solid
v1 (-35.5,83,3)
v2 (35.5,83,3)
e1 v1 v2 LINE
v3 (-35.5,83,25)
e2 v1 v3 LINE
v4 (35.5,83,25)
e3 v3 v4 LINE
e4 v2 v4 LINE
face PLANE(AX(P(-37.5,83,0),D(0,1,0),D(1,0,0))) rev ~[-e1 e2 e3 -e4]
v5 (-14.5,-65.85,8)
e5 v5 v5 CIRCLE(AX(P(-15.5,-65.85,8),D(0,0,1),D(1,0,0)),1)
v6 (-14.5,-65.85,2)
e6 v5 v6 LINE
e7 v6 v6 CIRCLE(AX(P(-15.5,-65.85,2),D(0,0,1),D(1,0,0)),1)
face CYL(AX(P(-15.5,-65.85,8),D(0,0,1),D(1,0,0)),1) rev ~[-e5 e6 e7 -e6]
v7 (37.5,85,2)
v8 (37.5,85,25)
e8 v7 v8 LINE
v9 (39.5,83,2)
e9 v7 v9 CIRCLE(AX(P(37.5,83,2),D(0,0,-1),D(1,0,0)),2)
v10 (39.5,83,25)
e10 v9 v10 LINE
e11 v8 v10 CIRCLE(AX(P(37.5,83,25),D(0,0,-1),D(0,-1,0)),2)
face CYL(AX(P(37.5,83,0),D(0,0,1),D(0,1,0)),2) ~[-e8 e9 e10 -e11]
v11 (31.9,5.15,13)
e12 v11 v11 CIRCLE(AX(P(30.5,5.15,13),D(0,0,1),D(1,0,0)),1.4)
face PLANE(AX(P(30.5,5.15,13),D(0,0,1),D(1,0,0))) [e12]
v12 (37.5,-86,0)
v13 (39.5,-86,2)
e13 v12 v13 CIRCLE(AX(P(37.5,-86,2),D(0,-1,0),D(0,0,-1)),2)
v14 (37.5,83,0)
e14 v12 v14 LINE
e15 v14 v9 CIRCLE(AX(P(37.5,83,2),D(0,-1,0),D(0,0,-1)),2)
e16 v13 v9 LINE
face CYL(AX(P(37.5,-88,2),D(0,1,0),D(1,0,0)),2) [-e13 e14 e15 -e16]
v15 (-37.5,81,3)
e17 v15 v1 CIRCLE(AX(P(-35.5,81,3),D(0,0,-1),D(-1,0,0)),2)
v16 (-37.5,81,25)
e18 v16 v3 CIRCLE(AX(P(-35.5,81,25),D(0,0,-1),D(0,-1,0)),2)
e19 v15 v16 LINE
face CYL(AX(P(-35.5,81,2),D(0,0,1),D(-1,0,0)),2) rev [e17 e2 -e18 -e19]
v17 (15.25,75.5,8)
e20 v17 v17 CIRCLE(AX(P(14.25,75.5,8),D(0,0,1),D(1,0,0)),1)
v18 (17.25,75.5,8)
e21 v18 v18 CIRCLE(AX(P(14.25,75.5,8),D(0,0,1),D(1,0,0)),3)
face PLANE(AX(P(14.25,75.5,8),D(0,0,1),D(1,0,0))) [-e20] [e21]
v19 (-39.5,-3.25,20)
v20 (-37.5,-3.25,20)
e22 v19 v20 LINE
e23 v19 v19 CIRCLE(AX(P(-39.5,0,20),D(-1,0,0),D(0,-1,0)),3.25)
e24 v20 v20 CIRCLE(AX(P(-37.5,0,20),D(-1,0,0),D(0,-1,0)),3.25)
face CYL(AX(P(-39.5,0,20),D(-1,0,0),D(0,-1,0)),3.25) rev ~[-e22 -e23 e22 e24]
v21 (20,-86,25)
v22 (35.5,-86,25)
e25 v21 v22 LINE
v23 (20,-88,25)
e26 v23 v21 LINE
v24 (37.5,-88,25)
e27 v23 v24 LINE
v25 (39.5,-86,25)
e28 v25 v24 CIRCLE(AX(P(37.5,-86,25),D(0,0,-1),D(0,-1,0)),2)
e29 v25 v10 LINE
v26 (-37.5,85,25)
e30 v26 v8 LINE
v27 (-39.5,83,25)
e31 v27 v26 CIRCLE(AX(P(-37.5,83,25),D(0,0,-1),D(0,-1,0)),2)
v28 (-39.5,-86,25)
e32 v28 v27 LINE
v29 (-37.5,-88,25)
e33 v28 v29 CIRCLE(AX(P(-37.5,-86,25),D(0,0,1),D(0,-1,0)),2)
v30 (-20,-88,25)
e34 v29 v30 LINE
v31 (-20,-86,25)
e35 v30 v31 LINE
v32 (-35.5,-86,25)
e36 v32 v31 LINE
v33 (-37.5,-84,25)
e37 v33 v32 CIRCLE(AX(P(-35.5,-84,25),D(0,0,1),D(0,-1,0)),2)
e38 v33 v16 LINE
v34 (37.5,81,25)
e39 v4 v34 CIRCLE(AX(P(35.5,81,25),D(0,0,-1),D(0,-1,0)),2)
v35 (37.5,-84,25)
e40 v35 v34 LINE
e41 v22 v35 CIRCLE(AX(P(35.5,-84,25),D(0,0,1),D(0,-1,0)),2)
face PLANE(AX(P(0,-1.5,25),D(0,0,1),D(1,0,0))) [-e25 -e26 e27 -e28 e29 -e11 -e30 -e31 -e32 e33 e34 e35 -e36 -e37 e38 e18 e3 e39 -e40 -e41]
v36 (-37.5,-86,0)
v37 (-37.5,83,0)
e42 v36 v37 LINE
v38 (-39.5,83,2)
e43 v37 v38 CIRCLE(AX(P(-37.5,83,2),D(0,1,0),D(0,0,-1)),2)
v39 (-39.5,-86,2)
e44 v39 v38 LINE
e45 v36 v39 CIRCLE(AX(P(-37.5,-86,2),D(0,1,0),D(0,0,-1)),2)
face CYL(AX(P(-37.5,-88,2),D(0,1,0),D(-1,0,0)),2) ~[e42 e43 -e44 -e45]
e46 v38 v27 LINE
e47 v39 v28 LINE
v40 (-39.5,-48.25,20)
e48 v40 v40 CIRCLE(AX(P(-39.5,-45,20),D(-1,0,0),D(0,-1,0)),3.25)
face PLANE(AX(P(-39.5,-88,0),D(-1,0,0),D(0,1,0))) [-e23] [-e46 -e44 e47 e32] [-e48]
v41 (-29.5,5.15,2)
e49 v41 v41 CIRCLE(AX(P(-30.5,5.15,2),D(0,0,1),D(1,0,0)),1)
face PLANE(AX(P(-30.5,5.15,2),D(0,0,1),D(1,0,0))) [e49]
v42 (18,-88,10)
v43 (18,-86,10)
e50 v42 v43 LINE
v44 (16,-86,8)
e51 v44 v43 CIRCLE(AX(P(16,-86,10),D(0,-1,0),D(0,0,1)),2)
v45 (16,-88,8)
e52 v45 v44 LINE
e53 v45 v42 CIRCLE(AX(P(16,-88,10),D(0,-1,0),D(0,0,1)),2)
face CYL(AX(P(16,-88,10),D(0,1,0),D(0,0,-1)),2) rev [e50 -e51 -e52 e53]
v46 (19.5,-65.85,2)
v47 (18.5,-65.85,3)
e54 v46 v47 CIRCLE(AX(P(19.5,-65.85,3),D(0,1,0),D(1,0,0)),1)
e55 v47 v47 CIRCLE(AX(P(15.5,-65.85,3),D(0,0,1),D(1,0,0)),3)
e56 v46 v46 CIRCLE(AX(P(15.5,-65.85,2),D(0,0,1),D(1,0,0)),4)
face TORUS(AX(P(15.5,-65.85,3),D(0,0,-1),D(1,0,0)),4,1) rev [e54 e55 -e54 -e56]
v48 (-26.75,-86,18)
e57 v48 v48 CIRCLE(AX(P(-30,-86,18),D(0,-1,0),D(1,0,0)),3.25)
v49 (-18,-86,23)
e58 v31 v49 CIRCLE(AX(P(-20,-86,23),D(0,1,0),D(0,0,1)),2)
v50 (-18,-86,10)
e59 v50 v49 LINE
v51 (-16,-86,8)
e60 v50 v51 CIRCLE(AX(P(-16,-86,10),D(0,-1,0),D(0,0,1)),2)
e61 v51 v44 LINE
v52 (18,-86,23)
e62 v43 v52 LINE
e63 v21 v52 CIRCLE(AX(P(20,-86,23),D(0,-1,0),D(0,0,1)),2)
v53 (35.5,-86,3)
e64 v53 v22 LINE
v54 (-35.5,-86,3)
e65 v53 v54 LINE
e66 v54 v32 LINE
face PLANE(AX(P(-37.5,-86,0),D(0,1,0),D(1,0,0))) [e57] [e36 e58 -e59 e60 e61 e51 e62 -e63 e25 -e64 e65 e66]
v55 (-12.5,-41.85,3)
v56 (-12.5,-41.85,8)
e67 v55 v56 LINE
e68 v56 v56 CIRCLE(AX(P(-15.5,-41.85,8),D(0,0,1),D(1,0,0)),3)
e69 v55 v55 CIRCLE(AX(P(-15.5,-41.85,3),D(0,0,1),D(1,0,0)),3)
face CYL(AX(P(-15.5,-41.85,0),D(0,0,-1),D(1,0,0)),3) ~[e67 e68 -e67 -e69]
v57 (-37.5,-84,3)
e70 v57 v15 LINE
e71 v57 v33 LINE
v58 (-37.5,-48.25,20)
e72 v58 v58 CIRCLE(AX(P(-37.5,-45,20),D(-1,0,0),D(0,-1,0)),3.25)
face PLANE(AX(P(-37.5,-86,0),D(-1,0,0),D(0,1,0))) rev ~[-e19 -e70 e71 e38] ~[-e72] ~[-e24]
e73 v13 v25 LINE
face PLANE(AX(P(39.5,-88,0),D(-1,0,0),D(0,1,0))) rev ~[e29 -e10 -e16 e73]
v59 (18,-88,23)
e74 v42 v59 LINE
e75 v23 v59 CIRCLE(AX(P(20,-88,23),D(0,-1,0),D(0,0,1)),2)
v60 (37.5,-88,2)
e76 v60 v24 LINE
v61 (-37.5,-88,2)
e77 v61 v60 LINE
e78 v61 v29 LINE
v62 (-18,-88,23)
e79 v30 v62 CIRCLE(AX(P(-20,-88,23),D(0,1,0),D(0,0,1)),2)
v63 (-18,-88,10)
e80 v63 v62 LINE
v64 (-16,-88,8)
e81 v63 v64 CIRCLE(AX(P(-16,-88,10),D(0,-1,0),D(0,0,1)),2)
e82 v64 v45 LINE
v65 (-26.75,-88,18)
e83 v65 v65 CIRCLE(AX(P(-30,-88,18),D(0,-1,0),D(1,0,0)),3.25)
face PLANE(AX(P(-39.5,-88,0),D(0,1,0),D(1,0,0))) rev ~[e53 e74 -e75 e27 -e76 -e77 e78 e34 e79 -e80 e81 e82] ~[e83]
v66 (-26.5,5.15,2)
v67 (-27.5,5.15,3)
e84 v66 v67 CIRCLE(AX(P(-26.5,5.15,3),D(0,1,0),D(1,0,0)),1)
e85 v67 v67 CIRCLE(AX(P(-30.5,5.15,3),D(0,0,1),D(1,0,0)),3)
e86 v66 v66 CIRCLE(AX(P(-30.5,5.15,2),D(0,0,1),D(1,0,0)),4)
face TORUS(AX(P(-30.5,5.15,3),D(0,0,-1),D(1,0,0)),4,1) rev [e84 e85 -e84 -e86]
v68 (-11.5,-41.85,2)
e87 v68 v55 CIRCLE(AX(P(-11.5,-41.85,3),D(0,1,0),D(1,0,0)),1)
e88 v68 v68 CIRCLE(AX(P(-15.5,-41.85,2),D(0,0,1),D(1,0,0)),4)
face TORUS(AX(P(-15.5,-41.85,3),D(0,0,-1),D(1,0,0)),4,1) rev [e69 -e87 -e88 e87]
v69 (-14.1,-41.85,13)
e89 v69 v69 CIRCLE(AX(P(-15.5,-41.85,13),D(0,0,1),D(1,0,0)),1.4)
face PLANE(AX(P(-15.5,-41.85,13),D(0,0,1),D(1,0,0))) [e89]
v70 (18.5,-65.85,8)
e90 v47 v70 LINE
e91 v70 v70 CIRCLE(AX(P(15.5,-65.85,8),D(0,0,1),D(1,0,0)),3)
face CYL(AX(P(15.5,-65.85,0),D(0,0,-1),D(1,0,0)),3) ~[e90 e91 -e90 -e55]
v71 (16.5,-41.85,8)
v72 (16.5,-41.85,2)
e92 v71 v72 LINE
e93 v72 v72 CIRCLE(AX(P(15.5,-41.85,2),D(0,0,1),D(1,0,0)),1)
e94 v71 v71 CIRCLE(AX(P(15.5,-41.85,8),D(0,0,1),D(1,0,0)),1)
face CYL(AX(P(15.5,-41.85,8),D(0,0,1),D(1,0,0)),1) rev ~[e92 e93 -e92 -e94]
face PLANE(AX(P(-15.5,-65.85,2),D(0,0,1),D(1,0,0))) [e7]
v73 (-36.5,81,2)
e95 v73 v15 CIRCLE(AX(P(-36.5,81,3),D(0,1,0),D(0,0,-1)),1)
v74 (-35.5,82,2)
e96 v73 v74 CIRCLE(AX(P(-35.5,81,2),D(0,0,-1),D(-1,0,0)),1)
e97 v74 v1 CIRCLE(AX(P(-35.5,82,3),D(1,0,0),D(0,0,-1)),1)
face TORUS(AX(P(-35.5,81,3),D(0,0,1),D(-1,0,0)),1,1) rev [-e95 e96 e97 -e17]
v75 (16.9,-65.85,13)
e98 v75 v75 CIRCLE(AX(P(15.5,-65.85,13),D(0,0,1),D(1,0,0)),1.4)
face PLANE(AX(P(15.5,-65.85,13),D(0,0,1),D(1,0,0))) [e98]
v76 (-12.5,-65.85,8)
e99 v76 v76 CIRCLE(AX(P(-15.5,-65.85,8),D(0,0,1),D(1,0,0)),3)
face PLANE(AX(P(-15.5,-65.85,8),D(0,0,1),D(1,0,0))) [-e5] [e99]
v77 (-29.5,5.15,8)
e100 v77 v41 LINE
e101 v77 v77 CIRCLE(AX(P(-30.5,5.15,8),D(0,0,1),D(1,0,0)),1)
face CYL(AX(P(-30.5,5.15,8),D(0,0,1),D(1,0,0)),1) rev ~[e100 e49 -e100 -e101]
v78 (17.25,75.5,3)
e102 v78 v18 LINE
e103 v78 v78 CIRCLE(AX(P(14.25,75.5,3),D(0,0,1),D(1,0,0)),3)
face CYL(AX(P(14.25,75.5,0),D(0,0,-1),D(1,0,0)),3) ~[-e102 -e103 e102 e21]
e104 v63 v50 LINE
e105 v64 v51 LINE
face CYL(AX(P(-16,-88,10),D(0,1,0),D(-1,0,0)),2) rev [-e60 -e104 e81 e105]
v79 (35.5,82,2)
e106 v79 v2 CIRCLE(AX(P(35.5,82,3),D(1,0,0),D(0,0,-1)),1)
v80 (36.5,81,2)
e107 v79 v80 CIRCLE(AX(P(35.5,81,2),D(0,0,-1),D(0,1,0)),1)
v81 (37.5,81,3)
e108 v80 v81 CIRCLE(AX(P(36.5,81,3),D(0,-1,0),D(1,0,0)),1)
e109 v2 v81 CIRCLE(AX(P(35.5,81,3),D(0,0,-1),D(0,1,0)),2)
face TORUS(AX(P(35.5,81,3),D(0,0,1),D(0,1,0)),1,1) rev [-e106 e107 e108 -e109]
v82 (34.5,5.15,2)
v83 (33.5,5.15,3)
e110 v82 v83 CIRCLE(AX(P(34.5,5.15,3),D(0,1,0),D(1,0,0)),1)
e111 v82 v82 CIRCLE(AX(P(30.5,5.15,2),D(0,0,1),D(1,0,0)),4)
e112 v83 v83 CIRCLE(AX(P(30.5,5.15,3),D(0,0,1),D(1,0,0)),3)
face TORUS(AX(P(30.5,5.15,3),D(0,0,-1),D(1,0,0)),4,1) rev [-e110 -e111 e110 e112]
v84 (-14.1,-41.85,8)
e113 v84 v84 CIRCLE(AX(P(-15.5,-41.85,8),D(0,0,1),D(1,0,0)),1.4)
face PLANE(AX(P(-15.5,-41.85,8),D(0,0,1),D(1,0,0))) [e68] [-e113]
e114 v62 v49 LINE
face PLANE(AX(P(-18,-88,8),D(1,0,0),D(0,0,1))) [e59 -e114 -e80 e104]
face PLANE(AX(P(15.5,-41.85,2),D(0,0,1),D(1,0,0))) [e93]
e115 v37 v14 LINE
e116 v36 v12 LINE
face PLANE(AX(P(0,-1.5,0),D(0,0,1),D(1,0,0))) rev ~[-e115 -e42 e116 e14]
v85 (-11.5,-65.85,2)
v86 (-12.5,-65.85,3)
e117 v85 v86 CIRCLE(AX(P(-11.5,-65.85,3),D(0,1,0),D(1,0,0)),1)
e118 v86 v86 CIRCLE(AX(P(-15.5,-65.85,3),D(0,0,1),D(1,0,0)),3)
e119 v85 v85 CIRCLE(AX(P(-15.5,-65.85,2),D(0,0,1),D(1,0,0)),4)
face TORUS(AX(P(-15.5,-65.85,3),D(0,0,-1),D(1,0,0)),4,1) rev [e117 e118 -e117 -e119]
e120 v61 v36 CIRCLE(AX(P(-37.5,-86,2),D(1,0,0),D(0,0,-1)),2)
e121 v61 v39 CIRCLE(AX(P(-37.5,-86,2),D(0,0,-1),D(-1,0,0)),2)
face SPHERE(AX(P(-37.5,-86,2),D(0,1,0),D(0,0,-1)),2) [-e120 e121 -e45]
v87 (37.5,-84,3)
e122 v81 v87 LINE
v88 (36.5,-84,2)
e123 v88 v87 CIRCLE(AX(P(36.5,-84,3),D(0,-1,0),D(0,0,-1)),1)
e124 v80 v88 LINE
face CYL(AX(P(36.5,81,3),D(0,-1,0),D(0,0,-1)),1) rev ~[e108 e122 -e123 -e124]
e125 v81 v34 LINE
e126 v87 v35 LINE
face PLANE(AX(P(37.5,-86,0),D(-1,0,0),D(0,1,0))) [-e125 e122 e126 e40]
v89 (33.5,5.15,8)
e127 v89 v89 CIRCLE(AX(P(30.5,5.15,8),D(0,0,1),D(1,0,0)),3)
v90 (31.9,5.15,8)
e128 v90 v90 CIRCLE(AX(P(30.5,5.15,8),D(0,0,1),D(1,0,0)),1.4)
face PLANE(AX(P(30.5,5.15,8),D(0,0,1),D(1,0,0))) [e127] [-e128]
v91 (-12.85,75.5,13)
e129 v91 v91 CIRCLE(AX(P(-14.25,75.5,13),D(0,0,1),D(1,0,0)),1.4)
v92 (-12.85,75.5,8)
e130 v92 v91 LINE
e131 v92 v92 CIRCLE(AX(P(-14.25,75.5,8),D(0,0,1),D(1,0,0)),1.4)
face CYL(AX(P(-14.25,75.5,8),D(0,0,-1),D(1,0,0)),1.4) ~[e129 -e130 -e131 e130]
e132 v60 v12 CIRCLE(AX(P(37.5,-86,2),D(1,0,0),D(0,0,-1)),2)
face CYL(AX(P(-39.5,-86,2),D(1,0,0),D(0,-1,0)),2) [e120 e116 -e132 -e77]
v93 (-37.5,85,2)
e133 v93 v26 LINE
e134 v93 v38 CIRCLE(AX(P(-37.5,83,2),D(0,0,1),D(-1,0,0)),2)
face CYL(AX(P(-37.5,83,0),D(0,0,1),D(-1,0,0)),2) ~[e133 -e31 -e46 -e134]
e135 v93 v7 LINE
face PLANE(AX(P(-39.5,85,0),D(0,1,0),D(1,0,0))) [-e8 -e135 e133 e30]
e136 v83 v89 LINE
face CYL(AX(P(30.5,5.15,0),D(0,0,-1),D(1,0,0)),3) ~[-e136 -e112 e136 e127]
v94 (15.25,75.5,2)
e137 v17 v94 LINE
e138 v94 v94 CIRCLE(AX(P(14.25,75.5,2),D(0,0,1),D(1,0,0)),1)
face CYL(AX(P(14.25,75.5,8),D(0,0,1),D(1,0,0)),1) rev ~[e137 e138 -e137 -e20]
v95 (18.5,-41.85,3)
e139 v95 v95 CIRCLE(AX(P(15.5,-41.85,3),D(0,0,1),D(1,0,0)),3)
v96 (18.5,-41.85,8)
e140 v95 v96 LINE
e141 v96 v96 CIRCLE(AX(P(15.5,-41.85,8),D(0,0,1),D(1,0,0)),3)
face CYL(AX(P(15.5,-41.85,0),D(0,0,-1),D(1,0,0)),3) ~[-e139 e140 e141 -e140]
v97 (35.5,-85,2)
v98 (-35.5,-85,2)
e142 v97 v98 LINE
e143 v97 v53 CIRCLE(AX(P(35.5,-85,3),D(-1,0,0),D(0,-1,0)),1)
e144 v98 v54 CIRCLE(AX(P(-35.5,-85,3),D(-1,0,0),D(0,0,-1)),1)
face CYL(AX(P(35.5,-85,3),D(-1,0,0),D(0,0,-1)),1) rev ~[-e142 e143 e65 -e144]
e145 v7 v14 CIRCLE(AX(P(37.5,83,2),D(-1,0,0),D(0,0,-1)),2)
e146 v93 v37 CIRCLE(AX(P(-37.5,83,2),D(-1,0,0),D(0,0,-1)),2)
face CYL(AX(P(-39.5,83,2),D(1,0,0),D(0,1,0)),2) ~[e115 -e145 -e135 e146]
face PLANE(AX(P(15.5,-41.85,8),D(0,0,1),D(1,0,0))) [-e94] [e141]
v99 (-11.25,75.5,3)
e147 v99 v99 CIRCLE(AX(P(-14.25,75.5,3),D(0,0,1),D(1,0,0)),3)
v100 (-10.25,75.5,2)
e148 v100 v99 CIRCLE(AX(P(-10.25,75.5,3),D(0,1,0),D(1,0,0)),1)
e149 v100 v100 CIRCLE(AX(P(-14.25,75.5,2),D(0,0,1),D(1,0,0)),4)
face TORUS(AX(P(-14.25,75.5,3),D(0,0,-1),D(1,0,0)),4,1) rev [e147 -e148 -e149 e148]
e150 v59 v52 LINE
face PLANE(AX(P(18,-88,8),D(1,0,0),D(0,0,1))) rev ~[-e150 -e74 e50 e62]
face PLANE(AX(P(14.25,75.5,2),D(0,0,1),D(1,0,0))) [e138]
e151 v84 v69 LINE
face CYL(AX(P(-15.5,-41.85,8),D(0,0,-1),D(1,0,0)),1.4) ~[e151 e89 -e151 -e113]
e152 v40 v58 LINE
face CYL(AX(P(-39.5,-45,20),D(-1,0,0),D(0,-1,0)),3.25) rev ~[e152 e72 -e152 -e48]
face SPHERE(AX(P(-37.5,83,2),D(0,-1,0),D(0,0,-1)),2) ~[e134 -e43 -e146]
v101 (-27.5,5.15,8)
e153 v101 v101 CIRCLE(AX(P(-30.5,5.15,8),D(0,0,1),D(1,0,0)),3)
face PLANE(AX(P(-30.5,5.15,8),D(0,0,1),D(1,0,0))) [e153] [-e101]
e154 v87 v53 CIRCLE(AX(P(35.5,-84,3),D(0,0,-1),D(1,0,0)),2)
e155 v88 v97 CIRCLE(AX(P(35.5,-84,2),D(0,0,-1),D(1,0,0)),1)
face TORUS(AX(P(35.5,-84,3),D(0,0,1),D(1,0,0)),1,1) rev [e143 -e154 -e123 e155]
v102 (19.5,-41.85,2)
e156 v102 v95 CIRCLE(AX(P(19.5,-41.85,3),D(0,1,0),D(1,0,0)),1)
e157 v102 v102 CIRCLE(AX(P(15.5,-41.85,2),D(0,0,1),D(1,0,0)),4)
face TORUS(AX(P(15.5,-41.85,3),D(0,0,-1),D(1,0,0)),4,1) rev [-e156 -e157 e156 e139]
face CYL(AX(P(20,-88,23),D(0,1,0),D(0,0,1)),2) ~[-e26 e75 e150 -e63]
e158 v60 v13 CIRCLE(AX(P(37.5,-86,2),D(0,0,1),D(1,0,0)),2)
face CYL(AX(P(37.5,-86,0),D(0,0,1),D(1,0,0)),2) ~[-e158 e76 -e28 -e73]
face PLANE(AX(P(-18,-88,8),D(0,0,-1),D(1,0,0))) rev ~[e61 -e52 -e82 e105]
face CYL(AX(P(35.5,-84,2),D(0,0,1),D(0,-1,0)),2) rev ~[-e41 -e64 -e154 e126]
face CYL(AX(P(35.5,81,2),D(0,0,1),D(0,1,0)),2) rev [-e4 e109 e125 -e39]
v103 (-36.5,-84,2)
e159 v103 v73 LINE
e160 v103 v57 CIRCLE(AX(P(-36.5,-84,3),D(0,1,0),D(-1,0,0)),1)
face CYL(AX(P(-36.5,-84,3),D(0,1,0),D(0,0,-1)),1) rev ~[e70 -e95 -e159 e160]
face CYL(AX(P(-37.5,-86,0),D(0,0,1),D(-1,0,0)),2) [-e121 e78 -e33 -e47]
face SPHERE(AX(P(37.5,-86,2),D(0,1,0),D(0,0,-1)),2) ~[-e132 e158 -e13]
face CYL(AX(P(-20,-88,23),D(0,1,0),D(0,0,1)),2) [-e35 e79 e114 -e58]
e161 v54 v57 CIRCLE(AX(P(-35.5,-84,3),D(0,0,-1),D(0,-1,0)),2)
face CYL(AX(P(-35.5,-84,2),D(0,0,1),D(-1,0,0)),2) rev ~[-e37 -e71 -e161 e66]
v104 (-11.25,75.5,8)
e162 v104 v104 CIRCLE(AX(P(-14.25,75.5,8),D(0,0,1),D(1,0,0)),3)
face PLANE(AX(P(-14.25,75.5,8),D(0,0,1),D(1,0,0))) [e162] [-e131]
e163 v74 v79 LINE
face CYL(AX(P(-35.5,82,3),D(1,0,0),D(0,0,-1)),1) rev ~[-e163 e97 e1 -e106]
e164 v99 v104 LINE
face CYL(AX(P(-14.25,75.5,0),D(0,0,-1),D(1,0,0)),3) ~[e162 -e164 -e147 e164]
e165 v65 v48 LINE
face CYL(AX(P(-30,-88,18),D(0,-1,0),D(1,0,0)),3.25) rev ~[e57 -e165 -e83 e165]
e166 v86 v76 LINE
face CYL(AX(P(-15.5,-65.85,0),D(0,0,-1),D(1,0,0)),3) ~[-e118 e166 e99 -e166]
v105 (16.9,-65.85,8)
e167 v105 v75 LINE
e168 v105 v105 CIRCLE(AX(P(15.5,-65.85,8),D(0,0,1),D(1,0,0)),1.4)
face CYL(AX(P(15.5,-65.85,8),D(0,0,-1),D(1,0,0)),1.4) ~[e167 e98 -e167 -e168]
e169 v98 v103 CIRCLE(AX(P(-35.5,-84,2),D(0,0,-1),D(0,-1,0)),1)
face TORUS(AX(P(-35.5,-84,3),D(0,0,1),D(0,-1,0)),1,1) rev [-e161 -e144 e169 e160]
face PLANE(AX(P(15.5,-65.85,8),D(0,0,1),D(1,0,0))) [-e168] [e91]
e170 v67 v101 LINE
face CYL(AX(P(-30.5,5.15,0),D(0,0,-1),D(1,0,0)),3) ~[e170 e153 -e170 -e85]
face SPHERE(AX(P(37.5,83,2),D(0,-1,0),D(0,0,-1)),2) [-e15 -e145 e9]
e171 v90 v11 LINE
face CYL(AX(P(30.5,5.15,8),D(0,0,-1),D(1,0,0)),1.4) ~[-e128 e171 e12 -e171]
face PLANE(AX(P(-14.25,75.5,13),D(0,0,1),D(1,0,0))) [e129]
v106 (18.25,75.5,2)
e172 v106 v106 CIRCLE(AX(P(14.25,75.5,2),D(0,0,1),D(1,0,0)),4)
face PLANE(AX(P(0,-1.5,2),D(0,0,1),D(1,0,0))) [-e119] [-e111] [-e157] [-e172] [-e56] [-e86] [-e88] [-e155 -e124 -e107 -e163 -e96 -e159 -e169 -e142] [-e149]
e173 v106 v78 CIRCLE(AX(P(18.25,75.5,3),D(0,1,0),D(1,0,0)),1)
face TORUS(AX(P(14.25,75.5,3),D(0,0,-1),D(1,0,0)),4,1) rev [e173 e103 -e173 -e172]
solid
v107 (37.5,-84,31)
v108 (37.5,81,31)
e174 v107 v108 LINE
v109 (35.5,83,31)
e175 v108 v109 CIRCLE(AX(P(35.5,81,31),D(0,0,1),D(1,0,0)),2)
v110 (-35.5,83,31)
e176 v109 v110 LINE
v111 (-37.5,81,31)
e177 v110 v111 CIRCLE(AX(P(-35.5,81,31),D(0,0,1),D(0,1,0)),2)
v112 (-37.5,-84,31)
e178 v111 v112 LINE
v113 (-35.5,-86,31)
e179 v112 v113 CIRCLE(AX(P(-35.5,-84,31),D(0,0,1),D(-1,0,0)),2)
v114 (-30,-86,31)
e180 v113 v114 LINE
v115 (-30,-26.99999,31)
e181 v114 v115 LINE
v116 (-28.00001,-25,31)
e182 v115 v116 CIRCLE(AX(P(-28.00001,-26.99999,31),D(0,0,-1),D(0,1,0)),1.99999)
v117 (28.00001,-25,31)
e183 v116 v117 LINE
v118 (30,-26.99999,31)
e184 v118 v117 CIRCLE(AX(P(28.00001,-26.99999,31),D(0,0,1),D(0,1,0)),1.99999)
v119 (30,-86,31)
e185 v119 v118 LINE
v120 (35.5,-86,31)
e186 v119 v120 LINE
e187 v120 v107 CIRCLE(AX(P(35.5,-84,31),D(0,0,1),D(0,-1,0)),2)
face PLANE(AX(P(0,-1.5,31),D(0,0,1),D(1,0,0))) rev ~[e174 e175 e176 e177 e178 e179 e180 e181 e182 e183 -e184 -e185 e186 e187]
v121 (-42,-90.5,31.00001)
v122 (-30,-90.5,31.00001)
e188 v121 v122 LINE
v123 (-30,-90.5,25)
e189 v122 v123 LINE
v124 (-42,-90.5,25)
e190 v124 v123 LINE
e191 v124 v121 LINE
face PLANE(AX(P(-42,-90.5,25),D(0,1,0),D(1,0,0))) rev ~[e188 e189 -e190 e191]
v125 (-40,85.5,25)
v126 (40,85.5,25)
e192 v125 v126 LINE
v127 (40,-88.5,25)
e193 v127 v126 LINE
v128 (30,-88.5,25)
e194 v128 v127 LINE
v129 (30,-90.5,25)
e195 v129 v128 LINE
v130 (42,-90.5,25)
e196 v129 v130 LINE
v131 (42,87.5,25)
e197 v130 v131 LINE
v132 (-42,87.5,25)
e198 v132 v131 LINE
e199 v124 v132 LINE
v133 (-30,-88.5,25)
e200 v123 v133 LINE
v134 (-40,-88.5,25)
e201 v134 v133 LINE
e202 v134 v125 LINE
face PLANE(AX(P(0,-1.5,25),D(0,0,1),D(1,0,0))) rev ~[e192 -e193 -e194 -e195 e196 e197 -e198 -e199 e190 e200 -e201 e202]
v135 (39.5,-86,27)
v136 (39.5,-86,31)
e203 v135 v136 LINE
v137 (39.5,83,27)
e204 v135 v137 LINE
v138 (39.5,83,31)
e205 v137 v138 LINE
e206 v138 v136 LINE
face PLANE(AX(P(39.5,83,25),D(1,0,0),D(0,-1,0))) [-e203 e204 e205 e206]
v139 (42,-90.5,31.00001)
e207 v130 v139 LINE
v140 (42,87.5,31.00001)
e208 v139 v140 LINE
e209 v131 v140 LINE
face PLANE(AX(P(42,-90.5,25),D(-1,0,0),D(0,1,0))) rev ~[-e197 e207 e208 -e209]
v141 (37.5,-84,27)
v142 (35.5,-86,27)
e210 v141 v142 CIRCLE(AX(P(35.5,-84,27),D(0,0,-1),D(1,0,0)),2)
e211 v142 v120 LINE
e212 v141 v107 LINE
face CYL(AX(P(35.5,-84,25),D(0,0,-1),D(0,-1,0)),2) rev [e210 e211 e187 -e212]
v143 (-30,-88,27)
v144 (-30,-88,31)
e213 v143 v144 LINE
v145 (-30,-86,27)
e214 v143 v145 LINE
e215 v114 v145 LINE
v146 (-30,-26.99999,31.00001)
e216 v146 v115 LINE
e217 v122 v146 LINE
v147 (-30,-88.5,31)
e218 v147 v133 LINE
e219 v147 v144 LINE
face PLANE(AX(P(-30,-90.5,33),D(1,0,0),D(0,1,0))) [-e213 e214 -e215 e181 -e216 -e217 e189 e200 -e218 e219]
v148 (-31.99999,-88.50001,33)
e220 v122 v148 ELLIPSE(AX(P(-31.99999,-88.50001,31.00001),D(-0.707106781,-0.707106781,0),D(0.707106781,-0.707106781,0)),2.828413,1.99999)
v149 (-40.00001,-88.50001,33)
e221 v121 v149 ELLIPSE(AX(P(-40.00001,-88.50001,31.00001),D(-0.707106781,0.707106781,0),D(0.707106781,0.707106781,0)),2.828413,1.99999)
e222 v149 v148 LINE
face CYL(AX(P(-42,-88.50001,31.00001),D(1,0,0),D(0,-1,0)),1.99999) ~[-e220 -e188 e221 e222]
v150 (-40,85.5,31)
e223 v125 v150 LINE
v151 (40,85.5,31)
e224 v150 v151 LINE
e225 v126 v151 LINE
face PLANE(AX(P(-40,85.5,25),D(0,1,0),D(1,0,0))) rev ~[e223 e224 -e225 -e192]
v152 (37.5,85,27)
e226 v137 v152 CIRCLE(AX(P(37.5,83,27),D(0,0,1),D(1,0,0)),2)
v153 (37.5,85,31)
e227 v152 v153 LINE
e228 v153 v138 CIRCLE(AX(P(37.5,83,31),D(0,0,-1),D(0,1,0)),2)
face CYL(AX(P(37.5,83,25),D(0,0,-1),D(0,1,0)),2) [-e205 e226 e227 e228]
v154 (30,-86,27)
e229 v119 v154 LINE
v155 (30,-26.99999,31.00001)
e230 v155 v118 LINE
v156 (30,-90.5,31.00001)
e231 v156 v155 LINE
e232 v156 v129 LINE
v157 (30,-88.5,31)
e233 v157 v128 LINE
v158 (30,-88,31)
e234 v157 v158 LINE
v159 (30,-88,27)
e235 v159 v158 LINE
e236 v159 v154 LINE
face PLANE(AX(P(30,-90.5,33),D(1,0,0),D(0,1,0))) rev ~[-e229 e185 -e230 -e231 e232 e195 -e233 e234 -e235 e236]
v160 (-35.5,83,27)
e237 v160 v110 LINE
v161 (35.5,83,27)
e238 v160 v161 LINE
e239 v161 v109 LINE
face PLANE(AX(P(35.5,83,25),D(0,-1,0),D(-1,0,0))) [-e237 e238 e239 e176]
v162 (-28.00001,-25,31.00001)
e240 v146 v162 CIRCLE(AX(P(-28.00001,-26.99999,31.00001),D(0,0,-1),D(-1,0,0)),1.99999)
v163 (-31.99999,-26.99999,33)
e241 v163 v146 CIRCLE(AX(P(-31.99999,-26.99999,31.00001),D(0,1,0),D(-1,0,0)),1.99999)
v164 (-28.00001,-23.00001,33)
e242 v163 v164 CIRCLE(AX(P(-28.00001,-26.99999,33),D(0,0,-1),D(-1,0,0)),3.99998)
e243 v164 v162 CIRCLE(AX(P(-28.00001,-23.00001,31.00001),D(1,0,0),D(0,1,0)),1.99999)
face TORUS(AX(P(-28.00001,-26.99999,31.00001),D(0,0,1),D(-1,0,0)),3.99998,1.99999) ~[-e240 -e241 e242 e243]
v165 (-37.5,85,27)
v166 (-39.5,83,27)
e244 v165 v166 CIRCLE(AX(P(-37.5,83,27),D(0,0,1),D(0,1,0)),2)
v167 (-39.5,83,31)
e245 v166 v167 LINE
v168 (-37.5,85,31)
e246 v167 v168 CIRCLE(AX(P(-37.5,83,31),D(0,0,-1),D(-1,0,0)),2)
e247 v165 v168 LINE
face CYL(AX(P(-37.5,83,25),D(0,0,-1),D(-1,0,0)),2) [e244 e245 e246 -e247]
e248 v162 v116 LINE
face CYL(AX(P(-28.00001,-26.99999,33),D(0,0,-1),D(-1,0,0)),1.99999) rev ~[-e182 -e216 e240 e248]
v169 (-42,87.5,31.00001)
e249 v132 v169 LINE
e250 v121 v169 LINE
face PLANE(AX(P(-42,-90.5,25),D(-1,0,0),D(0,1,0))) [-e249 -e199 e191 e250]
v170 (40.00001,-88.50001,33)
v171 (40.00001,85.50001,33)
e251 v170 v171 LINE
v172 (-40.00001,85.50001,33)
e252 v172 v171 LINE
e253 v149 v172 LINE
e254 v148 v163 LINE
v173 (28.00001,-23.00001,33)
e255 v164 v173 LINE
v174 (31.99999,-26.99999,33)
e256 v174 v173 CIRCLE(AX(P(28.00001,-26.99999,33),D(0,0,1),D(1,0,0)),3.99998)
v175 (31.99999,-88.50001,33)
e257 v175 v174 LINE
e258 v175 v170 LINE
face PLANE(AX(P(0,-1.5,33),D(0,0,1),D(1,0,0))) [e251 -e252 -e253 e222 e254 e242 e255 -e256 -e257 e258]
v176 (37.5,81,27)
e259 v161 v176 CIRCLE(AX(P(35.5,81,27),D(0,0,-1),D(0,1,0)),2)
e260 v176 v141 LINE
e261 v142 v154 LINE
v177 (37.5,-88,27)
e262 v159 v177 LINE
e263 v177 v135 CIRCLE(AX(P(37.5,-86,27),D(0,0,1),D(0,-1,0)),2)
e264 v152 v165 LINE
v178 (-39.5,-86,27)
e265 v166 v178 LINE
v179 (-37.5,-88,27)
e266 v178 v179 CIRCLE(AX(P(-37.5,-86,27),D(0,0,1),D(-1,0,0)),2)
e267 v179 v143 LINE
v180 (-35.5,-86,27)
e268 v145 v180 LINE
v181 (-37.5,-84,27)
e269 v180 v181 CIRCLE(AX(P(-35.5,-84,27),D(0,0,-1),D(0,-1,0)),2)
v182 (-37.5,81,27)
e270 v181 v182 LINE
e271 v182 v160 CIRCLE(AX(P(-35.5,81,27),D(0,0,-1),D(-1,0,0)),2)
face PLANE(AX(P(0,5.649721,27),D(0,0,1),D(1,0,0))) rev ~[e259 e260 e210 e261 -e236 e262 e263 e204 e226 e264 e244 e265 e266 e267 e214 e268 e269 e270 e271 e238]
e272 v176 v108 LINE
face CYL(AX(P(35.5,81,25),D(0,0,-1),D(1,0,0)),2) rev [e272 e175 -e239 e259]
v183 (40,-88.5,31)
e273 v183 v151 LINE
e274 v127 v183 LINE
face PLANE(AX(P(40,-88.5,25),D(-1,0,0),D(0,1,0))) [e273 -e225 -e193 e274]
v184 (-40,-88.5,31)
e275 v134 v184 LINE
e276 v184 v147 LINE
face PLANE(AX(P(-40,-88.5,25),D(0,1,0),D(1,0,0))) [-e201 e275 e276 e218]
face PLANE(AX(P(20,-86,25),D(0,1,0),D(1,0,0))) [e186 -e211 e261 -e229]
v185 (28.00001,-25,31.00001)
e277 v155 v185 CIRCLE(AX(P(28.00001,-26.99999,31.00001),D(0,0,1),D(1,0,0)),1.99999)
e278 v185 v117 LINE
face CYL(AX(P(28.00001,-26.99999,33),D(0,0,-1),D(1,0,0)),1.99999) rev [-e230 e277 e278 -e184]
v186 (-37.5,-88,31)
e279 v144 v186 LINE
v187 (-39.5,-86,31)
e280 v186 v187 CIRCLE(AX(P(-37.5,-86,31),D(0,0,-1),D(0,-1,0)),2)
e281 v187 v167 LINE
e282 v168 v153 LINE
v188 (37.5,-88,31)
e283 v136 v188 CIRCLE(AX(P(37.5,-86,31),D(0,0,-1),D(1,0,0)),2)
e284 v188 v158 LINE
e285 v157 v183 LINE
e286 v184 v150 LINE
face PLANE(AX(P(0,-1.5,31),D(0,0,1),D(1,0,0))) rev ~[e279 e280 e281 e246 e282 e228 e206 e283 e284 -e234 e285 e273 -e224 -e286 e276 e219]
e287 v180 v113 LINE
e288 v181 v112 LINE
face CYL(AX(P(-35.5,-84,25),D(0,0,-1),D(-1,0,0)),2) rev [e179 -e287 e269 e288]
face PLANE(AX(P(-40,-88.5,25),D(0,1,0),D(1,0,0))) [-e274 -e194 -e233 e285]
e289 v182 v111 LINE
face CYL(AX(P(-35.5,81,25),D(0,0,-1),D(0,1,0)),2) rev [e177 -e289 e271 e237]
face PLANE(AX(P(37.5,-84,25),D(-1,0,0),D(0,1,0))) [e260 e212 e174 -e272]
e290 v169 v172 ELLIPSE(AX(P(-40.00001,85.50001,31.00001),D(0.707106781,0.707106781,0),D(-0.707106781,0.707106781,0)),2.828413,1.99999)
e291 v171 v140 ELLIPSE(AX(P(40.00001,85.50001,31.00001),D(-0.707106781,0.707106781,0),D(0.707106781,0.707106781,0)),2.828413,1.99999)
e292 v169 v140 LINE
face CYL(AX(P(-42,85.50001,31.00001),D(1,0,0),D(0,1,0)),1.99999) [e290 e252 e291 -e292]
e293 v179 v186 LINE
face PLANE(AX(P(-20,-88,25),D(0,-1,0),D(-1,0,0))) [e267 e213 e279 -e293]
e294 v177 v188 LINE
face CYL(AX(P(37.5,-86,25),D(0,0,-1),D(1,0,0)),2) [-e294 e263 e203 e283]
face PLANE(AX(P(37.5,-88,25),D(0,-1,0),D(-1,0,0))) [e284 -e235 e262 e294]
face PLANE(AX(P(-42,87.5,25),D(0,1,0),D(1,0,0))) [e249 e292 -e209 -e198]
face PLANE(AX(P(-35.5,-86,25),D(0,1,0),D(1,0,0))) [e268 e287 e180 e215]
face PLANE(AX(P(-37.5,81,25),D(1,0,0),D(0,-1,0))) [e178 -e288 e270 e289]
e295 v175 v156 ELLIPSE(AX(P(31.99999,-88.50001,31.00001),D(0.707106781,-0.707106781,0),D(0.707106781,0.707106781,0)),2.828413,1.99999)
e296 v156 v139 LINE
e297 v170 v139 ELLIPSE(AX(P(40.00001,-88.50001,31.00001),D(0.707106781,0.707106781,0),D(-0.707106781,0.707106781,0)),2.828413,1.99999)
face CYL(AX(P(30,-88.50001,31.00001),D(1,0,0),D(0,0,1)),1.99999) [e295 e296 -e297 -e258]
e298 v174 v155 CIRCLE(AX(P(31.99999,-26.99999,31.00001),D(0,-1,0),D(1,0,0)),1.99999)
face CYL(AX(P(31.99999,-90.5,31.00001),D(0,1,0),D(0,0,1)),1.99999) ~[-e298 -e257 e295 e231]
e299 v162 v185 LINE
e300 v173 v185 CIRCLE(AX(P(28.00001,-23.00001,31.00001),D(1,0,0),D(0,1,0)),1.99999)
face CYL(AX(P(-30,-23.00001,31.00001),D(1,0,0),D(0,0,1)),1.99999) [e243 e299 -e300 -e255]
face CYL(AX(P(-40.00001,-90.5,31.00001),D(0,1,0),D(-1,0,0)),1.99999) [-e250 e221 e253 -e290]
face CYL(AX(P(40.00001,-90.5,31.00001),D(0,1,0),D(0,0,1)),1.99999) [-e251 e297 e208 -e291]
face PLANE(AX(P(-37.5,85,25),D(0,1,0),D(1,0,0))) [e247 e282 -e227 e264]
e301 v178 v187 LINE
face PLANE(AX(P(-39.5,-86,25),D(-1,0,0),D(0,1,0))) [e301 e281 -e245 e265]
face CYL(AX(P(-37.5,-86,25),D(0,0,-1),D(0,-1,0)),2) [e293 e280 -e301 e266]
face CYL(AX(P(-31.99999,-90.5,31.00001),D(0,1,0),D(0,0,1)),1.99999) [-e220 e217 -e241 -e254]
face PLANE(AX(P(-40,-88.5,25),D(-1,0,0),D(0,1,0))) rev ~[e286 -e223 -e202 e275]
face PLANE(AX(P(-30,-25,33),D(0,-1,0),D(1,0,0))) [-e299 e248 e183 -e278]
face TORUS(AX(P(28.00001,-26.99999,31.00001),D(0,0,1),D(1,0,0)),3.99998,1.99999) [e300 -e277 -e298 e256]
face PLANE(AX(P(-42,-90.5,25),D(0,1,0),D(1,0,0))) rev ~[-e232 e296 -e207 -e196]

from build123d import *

# Parameters (mm, degrees)
F0_W      = 75
F0_H      = 169
F0_R      = 3
F1_DEPTH  = 2
F0_W_2    = 79
F0_H_2    = 173
F2_DEPTH  = 25
F3_DEPTH  = 8
F4_R      = 1.4
F5_DEPTH  = 5
F4_R_2    = 1
F6_DEPTH  = 6
F7_W      = 36
F7_H      = 17
F8_DEPTH  = 2
F10_R     = 2
F11_R     = 1
F12_R     = 2
F13_R     = 3.25
F14_DEPTH = 2
F15_R     = 3.25
F16_DEPTH = 2
F17_W     = 84
F17_H     = 178
F17_W_2   = 80
F17_H_2   = 174
F18_DEPTH = 8
F19_DEPTH = 6
F20_DEPTH = 2
F21_W     = 60
F21_H     = 65.5
F22_DEPTH = 8.001
F23_R     = 1.99999


# Not quite as in the source:
# - a fillet or chamfer is up to 0.001 mm smaller than in the source, because OpenCascade refuses the exact size


with BuildPart() as f1:
    # F0 (on Top) → F1 (new body)
    with BuildSketch(Plane.XY):
        with Locations((0, -1.5)):
            Rectangle(F0_W, F0_H)
        with Locations((-15.5, -65.85)):
            Circle(F0_R, mode=Mode.SUBTRACT)
        with Locations((-15.5, -41.85)):
            Circle(F0_R, mode=Mode.SUBTRACT)
        with Locations((15.5, -65.85)):
            Circle(F0_R, mode=Mode.SUBTRACT)
        with Locations((15.5, -41.85)):
            Circle(F0_R, mode=Mode.SUBTRACT)
        with Locations((-30.5, 5.15)):
            Circle(F0_R, mode=Mode.SUBTRACT)
        with Locations((-14.25, 75.5)):
            Circle(F0_R, mode=Mode.SUBTRACT)
        with Locations((30.5, 5.15)):
            Circle(F0_R, mode=Mode.SUBTRACT)
        with Locations((14.25, 75.5)):
            Circle(F0_R, mode=Mode.SUBTRACT)
    extrude(amount=F1_DEPTH)

    # F0 (on Top) → F2 (join)
    with BuildSketch(Plane.XY):
        with Locations((0, -1.5)):
            Rectangle(F0_W_2, F0_H_2)
        with Locations((0, -1.5)):
            Rectangle(F0_W, F0_H, mode=Mode.SUBTRACT)
    extrude(amount=F2_DEPTH)

    # F0 (on Top) → F3 (join)
    with BuildSketch(Plane.XY):
        with Locations((-14.25, 75.5)):
            Circle(F0_R)
        with Locations((14.25, 75.5)):
            Circle(F0_R)
        with Locations((30.5, 5.15)):
            Circle(F0_R)
        with Locations((-30.5, 5.15)):
            Circle(F0_R)
        with Locations((15.5, -41.85)):
            Circle(F0_R)
        with Locations((15.5, -65.85)):
            Circle(F0_R)
        with Locations((-15.5, -41.85)):
            Circle(F0_R)
        with Locations((-15.5, -65.85)):
            Circle(F0_R)
    extrude(amount=F3_DEPTH)

    # F4 (on face) → F5 (join)
    with BuildSketch(Plane.XY.offset(8)):
        with Locations((-14.25, 75.5)):
            Circle(F4_R)
        with Locations((30.5, 5.15)):
            Circle(F4_R)
        with Locations((-15.5, -41.85)):
            Circle(F4_R)
        with Locations((15.5, -65.85)):
            Circle(F4_R)
    extrude(amount=F5_DEPTH)

    # F4 (on face) → F6 (cut)
    with BuildSketch(Plane.XY.offset(8)):
        with Locations((14.25, 75.5)):
            Circle(F4_R_2)
        with Locations((-30.5, 5.15)):
            Circle(F4_R_2)
        with Locations((15.5, -41.85)):
            Circle(F4_R_2)
        with Locations((-15.5, -65.85)):
            Circle(F4_R_2)
    extrude(amount=-F6_DEPTH, mode=Mode.SUBTRACT)

    # F7 (on face) → F8 (cut, through all)
    with BuildSketch(Plane.XZ.offset(88)):
        with Locations((0, 16.5)):
            Rectangle(F7_W, F7_H)
    extrude(amount=-F8_DEPTH, mode=Mode.SUBTRACT)

    # F10
    f10_edges = [f1.edges().sort_by_distance(p)[0] for p in [
        (-39.5, -1.5, 0),
        (39.5, -1.5, 0),
        (0, -88, 0),
        (0, 85, 0),
        (37.5, 83, 13.5),
        (-37.5, 83, 13.5),
        (-37.5, -86, 13.5),
        (37.5, -86, 13.5),
        (39.5, -88, 12.5),
        (39.5, 85, 12.5),
        (-39.5, 85, 12.5),
        (-39.5, -88, 12.5),
    ]]
    fillet(f10_edges, radius=F10_R)

    # F11
    f11_edges = [f1.edges().sort_by_distance(p)[0] for p in [
        (-18.5, -41.85, 2),
        (-33.5, 5.15, 2),
        (-17.25, 75.5, 2),
        (11.25, 75.5, 2),
        (0, 83, 2),
        (36.914214, 82.414214, 2),
        (-36.914214, 82.414214, 2),
        (37.5, -1.5, 2),
        (-37.5, -1.5, 2),
        (36.914214, -85.414214, 2),
        (-36.914214, -85.414214, 2),
        (0, -86, 2),
        (-18.5, -65.85, 2),
        (12.5, -65.85, 2),
        (12.5, -41.85, 2),
        (27.5, 5.15, 2),
    ]]
    fillet(f11_edges, radius=F11_R)

    # F12
    f12_edges = [f1.edges().sort_by_distance(p)[0] for p in [
        (-18, -87, 8),
        (18, -87, 8),
        (18, -87, 25),
        (-18, -87, 25),
    ]]
    fillet(f12_edges, radius=F12_R)

    # F13 (on face) → F14 (cut, through all)
    with BuildSketch(Plane(origin=(-39.5, 0, 0), x_dir=(0, -1, 0), z_dir=(-1, 0, 0))):
        with Locations((0, 20)):
            Circle(F13_R)
        with Locations((45, 20)):
            Circle(F13_R)
    extrude(amount=-F14_DEPTH, mode=Mode.SUBTRACT)

    # F15 (on face) → F16 (cut, through all)
    with BuildSketch(Plane.XZ.offset(88)):
        with Locations((-30, 18)):
            Circle(F15_R)
    extrude(amount=-F16_DEPTH, mode=Mode.SUBTRACT)


with BuildPart() as f18:
    # F17 (on face) → F18 (new body)
    with BuildSketch(Plane.XY.offset(25)):
        with Locations((0, -1.5)):
            Rectangle(F17_W, F17_H)
        with Locations((0, -1.5)):
            Rectangle(F17_W_2, F17_H_2, mode=Mode.SUBTRACT)
        with Locations((0, -1.5)):
            Rectangle(F17_W_2, F17_H_2)
        with BuildLine():
            Line((37.5, -88), (20, -88))
            Line((20, -88), (20, -86))
            Line((20, -86), (35.5, -86))
            ThreePointArc((35.5, -86), (36.9142135624, -85.4142135624), (37.5, -84))
            Line((37.5, -84), (37.5, 81))
            ThreePointArc((37.5, 81), (36.9142135624, 82.4142135624), (35.5, 83))
            Line((35.5, 83), (-35.5, 83))
            ThreePointArc((-35.5, 83), (-36.9142135624, 82.4142135624), (-37.5, 81))
            Line((-37.5, 81), (-37.5, -84))
            ThreePointArc((-37.5, -84), (-36.9142135624, -85.4142135624), (-35.5, -86))
            Line((-35.5, -86), (-20, -86))
            Line((-20, -86), (-20, -88))
            Line((-20, -88), (-37.5, -88))
            ThreePointArc((-37.5, -88), (-38.9142135624, -87.4142135624), (-39.5, -86))
            Line((-39.5, -86), (-39.5, 83))
            ThreePointArc((-39.5, 83), (-38.9142135624, 84.4142135624), (-37.5, 85))
            Line((-37.5, 85), (37.5, 85))
            ThreePointArc((37.5, 85), (38.9142135624, 84.4142135624), (39.5, 83))
            Line((39.5, 83), (39.5, -86))
            ThreePointArc((39.5, -86), (38.9142135624, -87.4142135624), (37.5, -88))
        make_face(mode=Mode.SUBTRACT)
        with BuildLine():
            Line((20, -86), (20, -88))
            Line((20, -88), (37.5, -88))
            ThreePointArc((37.5, -88), (38.9142135624, -87.4142135624), (39.5, -86))
            Line((39.5, -86), (39.5, 83))
            ThreePointArc((39.5, 83), (38.9142135624, 84.4142135624), (37.5, 85))
            Line((37.5, 85), (-37.5, 85))
            ThreePointArc((-37.5, 85), (-38.9142135624, 84.4142135624), (-39.5, 83))
            Line((-39.5, 83), (-39.5, -86))
            ThreePointArc((-39.5, -86), (-38.9142135624, -87.4142135624), (-37.5, -88))
            Line((-37.5, -88), (-20, -88))
            Line((-20, -88), (-20, -86))
            Line((-20, -86), (-35.5, -86))
            ThreePointArc((-35.5, -86), (-36.9142135624, -85.4142135624), (-37.5, -84))
            Line((-37.5, -84), (-37.5, 81))
            ThreePointArc((-37.5, 81), (-36.9142135624, 82.4142135624), (-35.5, 83))
            Line((-35.5, 83), (35.5, 83))
            ThreePointArc((35.5, 83), (36.9142135624, 82.4142135624), (37.5, 81))
            Line((37.5, 81), (37.5, -84))
            ThreePointArc((37.5, -84), (36.9142135624, -85.4142135624), (35.5, -86))
            Line((35.5, -86), (20, -86))
        make_face()
    extrude(amount=F18_DEPTH)

    # F17 (on face) → F19 (cut)
    with BuildSketch(Plane.XY.offset(25)):
        with Locations((0, -1.5)):
            Rectangle(F17_W_2, F17_H_2)
        with BuildLine():
            Line((37.5, -88), (20, -88))
            Line((20, -88), (20, -86))
            Line((20, -86), (35.5, -86))
            ThreePointArc((35.5, -86), (36.9142135624, -85.4142135624), (37.5, -84))
            Line((37.5, -84), (37.5, 81))
            ThreePointArc((37.5, 81), (36.9142135624, 82.4142135624), (35.5, 83))
            Line((35.5, 83), (-35.5, 83))
            ThreePointArc((-35.5, 83), (-36.9142135624, 82.4142135624), (-37.5, 81))
            Line((-37.5, 81), (-37.5, -84))
            ThreePointArc((-37.5, -84), (-36.9142135624, -85.4142135624), (-35.5, -86))
            Line((-35.5, -86), (-20, -86))
            Line((-20, -86), (-20, -88))
            Line((-20, -88), (-37.5, -88))
            ThreePointArc((-37.5, -88), (-38.9142135624, -87.4142135624), (-39.5, -86))
            Line((-39.5, -86), (-39.5, 83))
            ThreePointArc((-39.5, 83), (-38.9142135624, 84.4142135624), (-37.5, 85))
            Line((-37.5, 85), (37.5, 85))
            ThreePointArc((37.5, 85), (38.9142135624, 84.4142135624), (39.5, 83))
            Line((39.5, 83), (39.5, -86))
            ThreePointArc((39.5, -86), (38.9142135624, -87.4142135624), (37.5, -88))
        make_face(mode=Mode.SUBTRACT)
    extrude(amount=F19_DEPTH, mode=Mode.SUBTRACT)

    # F17 (on face) → F20 (cut)
    with BuildSketch(Plane.XY.offset(25)):
        with BuildLine():
            Line((20, -86), (20, -88))
            Line((20, -88), (37.5, -88))
            ThreePointArc((37.5, -88), (38.9142135624, -87.4142135624), (39.5, -86))
            Line((39.5, -86), (39.5, 83))
            ThreePointArc((39.5, 83), (38.9142135624, 84.4142135624), (37.5, 85))
            Line((37.5, 85), (-37.5, 85))
            ThreePointArc((-37.5, 85), (-38.9142135624, 84.4142135624), (-39.5, 83))
            Line((-39.5, 83), (-39.5, -86))
            ThreePointArc((-39.5, -86), (-38.9142135624, -87.4142135624), (-37.5, -88))
            Line((-37.5, -88), (-20, -88))
            Line((-20, -88), (-20, -86))
            Line((-20, -86), (-35.5, -86))
            ThreePointArc((-35.5, -86), (-36.9142135624, -85.4142135624), (-37.5, -84))
            Line((-37.5, -84), (-37.5, 81))
            ThreePointArc((-37.5, 81), (-36.9142135624, 82.4142135624), (-35.5, 83))
            Line((-35.5, 83), (35.5, 83))
            ThreePointArc((35.5, 83), (36.9142135624, 82.4142135624), (37.5, 81))
            Line((37.5, 81), (37.5, -84))
            ThreePointArc((37.5, -84), (36.9142135624, -85.4142135624), (35.5, -86))
            Line((35.5, -86), (20, -86))
        make_face()
    extrude(amount=F20_DEPTH, mode=Mode.SUBTRACT)

    # F21 (on face) → F22 (cut, through all)
    with BuildSketch(Plane.XY.offset(33)):
        with Locations((0, -57.75)):
            Rectangle(F21_W, F21_H)
    extrude(amount=-F22_DEPTH, mode=Mode.SUBTRACT)

    # F23 (radius 2 in the source; OpenCascade refuses exactly that, so slightly less here)
    f23_edges = [f18.edges().sort_by_distance(p)[0] for p in [
        (-42, -1.5, 33),
        (42, -1.5, 33),
        (36, -90.5, 33),
        (-36, -90.5, 33),
        (0, 87.5, 33),
        (-30, -25, 32),
        (30, -25, 32),
        (-30, -57.75, 33),
        (30, -57.75, 33),
        (0, -25, 33),
    ]]
    fillet(f23_edges, radius=F23_R)


solid = Compound([f1.part, f18.part])
